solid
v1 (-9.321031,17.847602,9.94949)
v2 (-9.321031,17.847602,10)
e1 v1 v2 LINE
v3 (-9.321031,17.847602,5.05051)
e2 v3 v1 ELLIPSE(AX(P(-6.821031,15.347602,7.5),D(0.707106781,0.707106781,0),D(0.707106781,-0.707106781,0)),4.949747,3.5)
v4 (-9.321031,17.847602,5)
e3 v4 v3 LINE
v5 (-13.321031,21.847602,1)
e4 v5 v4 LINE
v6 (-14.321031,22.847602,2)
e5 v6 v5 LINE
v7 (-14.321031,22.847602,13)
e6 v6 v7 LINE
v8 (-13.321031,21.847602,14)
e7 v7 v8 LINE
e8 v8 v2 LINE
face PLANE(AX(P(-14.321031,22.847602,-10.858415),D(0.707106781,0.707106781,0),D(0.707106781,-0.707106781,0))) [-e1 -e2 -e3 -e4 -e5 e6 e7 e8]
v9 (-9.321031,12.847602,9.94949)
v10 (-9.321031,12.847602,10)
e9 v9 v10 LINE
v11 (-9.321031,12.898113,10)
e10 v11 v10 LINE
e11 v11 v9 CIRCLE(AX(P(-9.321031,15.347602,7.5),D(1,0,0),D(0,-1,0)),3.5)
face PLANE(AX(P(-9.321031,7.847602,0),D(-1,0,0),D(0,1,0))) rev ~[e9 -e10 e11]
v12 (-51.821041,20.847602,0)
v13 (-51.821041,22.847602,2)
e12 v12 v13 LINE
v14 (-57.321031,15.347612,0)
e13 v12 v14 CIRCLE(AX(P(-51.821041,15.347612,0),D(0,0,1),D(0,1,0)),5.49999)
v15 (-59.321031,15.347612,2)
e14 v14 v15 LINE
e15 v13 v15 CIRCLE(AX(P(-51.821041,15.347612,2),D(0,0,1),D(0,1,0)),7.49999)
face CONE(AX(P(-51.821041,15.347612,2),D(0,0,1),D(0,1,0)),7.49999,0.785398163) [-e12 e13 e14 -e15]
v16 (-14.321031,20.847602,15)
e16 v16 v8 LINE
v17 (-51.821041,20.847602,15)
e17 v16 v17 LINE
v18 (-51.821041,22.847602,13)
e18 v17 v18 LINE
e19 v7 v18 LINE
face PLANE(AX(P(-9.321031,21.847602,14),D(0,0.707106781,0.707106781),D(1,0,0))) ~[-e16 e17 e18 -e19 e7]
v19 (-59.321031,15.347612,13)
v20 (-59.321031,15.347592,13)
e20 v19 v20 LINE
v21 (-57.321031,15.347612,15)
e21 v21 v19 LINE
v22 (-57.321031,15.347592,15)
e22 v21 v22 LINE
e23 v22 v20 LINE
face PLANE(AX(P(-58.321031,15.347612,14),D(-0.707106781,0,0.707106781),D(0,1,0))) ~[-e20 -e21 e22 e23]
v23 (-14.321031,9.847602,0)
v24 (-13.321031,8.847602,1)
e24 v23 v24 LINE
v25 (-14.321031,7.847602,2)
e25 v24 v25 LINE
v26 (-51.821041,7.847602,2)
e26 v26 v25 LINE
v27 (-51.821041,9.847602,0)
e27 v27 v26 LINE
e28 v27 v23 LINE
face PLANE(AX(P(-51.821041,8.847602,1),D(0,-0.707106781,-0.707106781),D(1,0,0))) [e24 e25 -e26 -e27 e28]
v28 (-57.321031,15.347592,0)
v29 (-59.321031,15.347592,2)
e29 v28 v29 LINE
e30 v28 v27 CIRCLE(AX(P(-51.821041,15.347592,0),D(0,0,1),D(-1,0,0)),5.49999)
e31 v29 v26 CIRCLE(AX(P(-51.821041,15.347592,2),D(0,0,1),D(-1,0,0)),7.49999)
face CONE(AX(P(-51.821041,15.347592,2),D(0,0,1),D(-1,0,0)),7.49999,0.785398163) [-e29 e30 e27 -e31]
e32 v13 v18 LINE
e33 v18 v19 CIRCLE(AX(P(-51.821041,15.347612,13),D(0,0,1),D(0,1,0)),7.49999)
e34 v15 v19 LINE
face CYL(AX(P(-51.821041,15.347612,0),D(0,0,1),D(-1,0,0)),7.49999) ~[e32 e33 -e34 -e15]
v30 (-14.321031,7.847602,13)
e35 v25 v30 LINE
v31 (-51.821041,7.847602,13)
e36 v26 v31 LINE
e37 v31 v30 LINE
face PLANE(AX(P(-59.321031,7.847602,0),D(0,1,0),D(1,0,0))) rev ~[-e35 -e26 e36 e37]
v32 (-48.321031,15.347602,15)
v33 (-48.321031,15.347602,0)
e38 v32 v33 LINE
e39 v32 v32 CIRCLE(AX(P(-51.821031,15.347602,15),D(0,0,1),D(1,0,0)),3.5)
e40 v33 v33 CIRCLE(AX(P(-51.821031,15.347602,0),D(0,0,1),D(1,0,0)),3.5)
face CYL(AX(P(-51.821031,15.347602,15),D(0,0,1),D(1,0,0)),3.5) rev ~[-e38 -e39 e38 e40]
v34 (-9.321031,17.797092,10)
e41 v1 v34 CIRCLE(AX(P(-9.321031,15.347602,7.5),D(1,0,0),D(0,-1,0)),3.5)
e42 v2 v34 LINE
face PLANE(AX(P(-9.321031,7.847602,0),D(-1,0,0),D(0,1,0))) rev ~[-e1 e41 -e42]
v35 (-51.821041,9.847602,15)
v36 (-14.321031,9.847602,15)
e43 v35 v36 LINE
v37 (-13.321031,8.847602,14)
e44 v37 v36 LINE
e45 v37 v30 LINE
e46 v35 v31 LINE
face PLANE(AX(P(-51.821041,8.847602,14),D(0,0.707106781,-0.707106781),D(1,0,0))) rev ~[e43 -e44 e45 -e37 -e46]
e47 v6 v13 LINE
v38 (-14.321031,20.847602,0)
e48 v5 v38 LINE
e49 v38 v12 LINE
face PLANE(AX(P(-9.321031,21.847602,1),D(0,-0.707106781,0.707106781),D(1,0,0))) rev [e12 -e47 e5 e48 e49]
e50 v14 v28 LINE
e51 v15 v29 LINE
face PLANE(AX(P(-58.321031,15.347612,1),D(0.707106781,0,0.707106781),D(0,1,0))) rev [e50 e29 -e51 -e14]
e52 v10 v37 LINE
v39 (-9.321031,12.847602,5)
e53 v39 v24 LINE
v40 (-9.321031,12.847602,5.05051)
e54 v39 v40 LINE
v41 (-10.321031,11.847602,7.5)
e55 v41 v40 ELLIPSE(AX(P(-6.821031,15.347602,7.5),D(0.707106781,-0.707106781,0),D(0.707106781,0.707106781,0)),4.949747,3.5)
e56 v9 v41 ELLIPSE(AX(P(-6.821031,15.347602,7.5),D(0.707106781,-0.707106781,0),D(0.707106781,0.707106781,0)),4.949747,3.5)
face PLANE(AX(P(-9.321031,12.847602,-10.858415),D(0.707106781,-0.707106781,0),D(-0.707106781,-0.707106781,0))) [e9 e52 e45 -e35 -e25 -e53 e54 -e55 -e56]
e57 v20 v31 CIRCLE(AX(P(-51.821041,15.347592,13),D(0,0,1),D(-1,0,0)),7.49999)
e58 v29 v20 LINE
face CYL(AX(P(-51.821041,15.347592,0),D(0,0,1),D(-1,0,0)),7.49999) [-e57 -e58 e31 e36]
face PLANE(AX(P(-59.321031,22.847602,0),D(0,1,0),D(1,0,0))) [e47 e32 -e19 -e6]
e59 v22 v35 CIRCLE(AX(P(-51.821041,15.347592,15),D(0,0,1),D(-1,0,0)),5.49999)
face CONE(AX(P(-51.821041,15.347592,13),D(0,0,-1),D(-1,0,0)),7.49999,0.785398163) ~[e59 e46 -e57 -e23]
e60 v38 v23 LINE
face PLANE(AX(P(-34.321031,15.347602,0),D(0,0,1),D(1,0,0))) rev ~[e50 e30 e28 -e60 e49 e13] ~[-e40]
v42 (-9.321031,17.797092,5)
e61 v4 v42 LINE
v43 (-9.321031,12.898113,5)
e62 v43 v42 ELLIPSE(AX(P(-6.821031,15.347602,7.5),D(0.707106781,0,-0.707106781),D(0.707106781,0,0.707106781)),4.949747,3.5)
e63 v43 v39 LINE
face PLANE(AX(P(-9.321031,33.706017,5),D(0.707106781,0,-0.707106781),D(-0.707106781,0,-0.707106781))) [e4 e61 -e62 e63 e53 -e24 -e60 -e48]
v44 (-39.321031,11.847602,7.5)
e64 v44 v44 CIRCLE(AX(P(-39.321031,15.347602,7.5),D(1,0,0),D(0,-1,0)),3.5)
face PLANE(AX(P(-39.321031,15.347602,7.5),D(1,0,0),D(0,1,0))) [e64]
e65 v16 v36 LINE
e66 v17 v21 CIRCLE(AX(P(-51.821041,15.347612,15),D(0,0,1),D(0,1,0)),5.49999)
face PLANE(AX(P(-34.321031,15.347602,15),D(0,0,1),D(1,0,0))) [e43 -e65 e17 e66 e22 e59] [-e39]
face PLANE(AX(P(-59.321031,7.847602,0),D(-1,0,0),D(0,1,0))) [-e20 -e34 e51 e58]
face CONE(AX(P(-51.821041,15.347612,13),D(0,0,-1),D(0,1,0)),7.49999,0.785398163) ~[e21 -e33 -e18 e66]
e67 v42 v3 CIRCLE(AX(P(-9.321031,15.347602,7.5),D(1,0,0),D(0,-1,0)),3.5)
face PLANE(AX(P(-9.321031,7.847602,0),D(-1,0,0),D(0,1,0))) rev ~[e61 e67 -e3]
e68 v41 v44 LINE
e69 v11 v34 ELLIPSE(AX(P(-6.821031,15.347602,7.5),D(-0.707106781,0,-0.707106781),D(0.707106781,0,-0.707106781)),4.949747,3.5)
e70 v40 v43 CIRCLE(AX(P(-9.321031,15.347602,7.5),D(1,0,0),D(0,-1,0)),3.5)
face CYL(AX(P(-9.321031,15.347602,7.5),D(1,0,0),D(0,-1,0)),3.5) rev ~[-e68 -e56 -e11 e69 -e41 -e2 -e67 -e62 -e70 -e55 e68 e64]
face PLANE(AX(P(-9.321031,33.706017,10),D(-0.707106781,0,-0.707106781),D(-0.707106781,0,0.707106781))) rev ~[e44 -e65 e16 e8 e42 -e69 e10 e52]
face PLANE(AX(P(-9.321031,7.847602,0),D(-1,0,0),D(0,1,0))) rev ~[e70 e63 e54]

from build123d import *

# Parameters (mm, degrees)
F0_W        = 50
F0_H        = 15
F1_DEPTH    = 15
F2_R        = 7.49999
F3_R        = 3.5
F4_DEPTH    = 25
F6_DEPTH    = 30
F7_SIZE     = 2
F8_T1_DEPTH = 36.7168298797
F8_T3_DEPTH = 36.7168298797


# Not quite as in the source:
# - a fillet or chamfer that OpenCascade refuses, or shapes differently, is made with other operations: its cross-section is extruded or revolved along the edge and cut away or added
# - a fillet or chamfer is up to 0.001 mm smaller than in the source, because OpenCascade refuses the exact size


with BuildPart() as f1:
    # F0 (on Top) → F1 (new body)
    with BuildSketch(Plane.XY):
        with Locations((-34.3210311607, 15.3476024792)):
            Rectangle(F0_W, F0_H)
    extrude(amount=F1_DEPTH)

    # F2 (radius 7.5 in the source; OpenCascade refuses exactly that, so slightly less here)
    f2_edges = [f1.edges().sort_by_distance(p)[0] for p in [
        (-59.321031, 22.847602, 7.5),
        (-59.321031, 7.847602, 7.5),
    ]]
    fillet(f2_edges, radius=F2_R)

    # F3 (on face) → F4 (cut)
    with BuildSketch(Plane.XY.offset(15)):
        with Locations((-51.8210311607, 15.3476024792)):
            Circle(F3_R)
    extrude(amount=-F4_DEPTH, mode=Mode.SUBTRACT)

    # F5 (on face) → F6 (cut)
    with BuildSketch(Plane.YZ.offset(-9.3210311607)):
        with BuildLine():
            ThreePointArc((18.8476024792, 7.5), (15.3476024792, 11), (11.8476024792, 7.5))
            ThreePointArc((11.8476024792, 7.5), (15.3476024792, 4), (18.8476024792, 7.5))
        make_face()
    extrude(amount=-F6_DEPTH, mode=Mode.SUBTRACT)

    # F7
    f7_edges = [f1.edges().sort_by_distance(p)[0] for p in [
        (-30.571036, 7.847602, 15),
        (-30.571036, 7.847602, 0),
    ]]
    chamfer(f7_edges, length=F7_SIZE)

    # F8: chamfer of 5 on 4 edges, made by hand

    # F8_s2 → F8_t1 (cut)
    with BuildSketch(Plane.XZ.offset(-33.706017419)):
        Polygon((-9.3210311607, 10), (-14.3210311607, 15), (-9.3210311607, 15), align=None)
        Polygon((-9.3210311607, 5), (-14.3210311607, 0), (-9.3210311607, 0), align=None)
    extrude(amount=F8_T1_DEPTH, mode=Mode.SUBTRACT)

    # F8_s4 → F8_t3 (cut)
    with BuildSketch(Plane.XY.offset(-10.8584149398)):
        Polygon((-9.3210311607, 12.8476024792), (-14.3210311607, 7.8476024792), (-9.3210311607, 7.8476024792), align=None)
        Polygon((-14.3210311607, 22.8476024792), (-9.3210311607, 17.8476024792), (-9.3210311607, 22.8476024792), align=None)
    extrude(amount=F8_T3_DEPTH, mode=Mode.SUBTRACT)


solid = f1.part
